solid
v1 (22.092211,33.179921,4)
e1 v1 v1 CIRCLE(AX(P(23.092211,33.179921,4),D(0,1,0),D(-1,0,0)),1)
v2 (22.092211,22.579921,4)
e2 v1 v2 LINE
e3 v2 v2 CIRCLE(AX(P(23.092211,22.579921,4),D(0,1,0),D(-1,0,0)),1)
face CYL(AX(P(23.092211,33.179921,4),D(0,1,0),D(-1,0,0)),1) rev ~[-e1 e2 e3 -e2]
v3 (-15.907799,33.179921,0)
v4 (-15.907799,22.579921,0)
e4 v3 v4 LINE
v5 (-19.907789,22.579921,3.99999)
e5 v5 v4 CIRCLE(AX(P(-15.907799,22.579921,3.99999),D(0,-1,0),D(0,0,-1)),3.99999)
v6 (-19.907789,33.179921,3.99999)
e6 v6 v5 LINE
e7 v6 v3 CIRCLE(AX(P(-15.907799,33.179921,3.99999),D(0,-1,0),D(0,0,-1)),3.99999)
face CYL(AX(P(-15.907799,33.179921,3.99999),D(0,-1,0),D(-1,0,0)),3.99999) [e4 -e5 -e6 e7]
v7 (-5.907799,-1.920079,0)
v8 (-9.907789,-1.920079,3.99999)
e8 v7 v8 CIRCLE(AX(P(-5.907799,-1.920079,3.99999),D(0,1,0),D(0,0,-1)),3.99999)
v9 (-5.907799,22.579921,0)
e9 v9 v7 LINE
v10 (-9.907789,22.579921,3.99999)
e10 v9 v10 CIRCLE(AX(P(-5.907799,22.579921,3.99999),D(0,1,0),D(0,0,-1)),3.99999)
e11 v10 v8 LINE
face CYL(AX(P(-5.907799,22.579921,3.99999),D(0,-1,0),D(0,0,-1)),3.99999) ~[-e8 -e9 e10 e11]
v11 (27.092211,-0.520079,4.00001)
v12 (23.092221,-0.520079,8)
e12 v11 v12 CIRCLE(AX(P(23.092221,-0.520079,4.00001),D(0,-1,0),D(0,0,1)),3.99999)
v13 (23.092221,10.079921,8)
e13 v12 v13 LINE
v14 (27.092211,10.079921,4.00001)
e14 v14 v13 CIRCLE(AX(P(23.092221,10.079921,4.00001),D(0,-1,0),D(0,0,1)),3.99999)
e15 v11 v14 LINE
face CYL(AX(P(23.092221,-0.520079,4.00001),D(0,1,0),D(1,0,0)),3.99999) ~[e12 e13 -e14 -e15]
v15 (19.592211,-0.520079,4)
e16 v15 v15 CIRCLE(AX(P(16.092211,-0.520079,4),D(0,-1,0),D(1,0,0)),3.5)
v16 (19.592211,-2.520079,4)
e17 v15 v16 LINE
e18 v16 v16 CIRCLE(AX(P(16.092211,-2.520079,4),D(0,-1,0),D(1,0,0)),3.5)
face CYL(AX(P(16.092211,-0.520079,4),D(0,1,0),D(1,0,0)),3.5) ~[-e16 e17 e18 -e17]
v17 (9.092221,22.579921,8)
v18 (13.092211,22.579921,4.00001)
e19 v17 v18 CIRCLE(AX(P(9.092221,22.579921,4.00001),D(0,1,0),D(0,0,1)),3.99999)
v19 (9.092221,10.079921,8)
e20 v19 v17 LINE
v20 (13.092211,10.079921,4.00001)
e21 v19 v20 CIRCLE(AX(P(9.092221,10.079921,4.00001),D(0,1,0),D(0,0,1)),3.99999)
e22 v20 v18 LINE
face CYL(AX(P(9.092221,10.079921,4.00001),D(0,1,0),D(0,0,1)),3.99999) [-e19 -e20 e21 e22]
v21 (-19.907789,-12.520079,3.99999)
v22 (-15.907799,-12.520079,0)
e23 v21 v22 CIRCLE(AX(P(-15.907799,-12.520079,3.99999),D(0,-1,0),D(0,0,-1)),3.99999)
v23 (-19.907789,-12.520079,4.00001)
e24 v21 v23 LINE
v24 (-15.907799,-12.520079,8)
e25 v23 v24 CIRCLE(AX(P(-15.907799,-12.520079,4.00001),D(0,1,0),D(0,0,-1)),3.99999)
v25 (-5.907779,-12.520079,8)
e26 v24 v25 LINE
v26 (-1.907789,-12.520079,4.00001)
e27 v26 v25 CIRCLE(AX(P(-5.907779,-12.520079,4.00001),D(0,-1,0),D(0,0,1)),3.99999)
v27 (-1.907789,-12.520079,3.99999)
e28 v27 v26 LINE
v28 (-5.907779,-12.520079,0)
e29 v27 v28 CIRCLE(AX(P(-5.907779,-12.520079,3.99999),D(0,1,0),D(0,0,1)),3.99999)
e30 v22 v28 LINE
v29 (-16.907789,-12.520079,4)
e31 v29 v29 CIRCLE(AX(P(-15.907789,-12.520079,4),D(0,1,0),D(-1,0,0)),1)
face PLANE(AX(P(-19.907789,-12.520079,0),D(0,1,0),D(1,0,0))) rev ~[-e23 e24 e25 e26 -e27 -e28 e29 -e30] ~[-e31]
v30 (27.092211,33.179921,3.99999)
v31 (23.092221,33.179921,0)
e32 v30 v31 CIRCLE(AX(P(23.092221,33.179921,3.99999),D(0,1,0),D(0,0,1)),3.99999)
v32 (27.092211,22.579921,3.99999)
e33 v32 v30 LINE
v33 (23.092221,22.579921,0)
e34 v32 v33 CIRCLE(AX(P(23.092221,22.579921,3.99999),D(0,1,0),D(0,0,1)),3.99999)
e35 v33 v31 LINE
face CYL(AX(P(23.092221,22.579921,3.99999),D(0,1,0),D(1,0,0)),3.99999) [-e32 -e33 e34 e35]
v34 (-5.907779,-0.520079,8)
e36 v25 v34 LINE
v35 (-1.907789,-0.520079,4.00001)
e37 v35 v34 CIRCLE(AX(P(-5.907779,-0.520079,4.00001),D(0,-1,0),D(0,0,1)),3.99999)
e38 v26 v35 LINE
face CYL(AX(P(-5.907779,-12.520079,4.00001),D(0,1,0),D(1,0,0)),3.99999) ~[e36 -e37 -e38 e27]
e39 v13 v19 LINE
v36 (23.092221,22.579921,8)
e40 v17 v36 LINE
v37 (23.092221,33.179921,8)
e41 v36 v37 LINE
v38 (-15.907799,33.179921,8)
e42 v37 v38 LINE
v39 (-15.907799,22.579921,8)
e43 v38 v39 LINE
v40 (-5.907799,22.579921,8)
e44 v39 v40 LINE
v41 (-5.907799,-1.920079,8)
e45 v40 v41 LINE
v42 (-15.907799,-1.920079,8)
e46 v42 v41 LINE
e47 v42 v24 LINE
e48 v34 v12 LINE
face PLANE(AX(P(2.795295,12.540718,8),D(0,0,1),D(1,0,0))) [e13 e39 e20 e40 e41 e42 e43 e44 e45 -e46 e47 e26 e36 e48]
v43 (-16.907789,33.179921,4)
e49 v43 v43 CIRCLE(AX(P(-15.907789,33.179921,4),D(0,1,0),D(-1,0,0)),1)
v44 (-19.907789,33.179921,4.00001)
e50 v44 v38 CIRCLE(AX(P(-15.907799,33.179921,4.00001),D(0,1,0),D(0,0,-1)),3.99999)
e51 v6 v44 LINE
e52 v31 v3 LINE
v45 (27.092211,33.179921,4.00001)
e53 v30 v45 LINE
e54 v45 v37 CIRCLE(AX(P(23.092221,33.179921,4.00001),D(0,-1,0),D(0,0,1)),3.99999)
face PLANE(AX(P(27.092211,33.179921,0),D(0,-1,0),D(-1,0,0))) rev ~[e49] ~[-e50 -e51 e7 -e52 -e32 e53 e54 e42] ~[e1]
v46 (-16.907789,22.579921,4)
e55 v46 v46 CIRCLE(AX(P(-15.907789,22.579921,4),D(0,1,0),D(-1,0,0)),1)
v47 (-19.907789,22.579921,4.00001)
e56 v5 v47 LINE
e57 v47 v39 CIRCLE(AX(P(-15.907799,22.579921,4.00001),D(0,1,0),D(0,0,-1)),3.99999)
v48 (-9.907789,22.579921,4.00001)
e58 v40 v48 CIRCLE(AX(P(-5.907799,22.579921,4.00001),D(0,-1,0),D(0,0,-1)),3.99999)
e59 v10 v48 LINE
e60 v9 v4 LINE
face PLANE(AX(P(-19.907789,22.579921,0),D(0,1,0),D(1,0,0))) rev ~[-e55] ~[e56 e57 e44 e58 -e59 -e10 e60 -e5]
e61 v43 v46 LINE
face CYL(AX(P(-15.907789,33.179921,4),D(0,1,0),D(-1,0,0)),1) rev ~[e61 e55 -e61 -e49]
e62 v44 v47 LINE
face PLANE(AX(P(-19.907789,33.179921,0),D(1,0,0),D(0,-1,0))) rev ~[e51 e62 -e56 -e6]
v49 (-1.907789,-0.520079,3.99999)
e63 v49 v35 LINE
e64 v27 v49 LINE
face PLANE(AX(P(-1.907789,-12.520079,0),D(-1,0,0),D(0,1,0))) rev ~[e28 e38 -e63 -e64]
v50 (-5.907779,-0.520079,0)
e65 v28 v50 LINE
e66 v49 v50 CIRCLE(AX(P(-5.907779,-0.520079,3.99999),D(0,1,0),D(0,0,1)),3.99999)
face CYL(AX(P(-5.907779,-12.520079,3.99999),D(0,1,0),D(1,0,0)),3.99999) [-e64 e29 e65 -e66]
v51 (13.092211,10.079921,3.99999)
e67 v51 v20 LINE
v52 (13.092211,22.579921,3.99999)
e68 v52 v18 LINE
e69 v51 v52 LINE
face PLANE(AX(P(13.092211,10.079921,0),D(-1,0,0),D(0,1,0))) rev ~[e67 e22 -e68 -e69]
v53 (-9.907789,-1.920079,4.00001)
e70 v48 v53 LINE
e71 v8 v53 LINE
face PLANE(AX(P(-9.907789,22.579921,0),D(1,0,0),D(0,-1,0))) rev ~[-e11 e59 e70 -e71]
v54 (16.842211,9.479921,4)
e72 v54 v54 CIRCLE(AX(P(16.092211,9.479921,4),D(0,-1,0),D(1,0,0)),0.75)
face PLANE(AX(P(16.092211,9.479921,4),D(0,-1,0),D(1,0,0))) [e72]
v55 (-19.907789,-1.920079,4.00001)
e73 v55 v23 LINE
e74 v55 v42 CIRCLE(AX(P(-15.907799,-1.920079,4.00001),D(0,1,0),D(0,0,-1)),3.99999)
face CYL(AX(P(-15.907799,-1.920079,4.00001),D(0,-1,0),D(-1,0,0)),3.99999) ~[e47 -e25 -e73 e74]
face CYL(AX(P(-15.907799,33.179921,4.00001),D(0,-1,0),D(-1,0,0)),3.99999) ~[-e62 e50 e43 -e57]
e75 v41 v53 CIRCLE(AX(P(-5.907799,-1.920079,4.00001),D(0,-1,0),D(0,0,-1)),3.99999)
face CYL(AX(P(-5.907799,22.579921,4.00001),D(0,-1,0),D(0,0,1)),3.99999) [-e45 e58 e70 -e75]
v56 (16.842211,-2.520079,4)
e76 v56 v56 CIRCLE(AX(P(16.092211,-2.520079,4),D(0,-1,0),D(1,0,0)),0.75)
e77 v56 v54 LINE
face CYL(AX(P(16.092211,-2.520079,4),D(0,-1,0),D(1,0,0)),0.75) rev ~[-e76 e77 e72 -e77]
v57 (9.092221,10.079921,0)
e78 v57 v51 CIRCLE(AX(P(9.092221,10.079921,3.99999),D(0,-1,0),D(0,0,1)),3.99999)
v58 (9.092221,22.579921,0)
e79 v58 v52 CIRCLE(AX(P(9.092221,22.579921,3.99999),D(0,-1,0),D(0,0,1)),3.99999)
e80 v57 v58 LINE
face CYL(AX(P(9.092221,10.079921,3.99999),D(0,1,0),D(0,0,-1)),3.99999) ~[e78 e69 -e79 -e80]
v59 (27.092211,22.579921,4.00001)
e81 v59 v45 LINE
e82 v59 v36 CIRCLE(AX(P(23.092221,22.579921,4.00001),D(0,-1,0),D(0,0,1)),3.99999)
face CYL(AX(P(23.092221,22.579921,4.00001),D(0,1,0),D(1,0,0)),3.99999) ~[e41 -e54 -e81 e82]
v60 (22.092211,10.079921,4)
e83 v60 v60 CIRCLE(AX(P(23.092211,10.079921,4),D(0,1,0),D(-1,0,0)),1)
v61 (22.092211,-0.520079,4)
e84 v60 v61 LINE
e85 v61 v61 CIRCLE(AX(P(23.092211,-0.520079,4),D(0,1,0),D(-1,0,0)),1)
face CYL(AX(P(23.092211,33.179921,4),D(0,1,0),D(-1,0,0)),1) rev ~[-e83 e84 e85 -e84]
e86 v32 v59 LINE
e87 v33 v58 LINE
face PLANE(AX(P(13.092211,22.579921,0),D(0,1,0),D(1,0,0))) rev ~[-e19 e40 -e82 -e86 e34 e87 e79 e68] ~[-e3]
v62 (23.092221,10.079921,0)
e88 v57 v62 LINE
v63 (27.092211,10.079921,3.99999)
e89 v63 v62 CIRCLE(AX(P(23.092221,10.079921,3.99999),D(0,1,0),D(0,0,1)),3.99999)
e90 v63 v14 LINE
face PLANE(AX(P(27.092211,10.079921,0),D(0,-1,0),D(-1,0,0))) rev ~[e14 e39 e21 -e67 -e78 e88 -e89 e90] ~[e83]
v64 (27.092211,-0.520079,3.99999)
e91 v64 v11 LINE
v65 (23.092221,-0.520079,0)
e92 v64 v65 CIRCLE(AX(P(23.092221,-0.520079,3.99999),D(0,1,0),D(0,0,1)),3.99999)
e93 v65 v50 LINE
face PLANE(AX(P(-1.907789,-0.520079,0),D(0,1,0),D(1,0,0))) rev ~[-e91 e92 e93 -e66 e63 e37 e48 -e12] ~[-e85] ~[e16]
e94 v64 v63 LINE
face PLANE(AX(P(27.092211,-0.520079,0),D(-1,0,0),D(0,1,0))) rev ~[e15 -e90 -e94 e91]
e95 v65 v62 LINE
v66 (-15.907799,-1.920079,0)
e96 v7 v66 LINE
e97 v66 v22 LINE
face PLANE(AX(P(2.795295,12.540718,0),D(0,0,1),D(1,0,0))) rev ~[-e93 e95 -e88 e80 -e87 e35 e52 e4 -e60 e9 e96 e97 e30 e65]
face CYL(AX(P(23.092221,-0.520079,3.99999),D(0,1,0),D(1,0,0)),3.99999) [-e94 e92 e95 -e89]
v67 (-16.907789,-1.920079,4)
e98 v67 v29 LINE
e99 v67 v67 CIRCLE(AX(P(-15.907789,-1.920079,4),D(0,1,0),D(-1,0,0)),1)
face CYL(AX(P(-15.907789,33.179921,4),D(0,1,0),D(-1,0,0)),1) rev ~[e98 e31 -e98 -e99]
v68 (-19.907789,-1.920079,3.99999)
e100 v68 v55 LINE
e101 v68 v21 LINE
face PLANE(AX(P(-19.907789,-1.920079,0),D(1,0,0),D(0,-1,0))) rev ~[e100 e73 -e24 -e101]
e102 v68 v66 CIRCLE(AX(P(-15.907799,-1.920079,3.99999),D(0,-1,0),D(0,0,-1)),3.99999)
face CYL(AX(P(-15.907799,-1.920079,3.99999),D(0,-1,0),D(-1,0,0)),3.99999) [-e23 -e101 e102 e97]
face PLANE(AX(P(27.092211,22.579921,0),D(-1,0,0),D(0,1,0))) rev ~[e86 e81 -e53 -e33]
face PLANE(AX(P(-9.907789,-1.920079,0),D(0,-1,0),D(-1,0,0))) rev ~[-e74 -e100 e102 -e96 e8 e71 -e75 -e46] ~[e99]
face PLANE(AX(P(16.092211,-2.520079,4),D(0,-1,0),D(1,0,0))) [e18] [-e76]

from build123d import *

# Parameters (mm, degrees)
F1_DEPTH = 8
F2_R     = 3.99999
F3_R     = 1
F4_DEPTH = 60
F6_R     = 3.99999
F5_R     = 3.5
F7_DEPTH = 2
F8_R     = 0.75
F9_DEPTH = 12


# Not quite as in the source:
# - a fillet or chamfer is up to 0.001 mm smaller than in the source, because OpenCascade refuses the exact size


with BuildPart() as f1:
    # F0 (on Top) → F1 (new body)
    with BuildSketch(Plane.XY):
        Polygon((-19.9077894302, -1.920078908), (-19.9077894302, -12.520078908), (-1.9077894302, -12.520078908), (-1.9077894302, -0.520078908), (27.0922105698, -0.520078908), (27.0922105698, 10.079921092), (13.0922105698, 10.079921092), (13.0922105698, 22.579921092), (27.0922105698, 22.579921092), (27.0922105698, 33.179921092), (-19.9077894302, 33.179921092), (-19.9077894302, 22.579921092), (-9.9077894302, 22.579921092), (-9.9077894302, -1.920078908), align=None)
    extrude(amount=F1_DEPTH)

    # F2 (radius 4 in the source; OpenCascade refuses exactly that, so slightly less here)
    f2_edges = [f1.edges().sort_by_distance(p)[0] for p in [
        (-19.907789, -7.220079, 8),
        (-19.907789, -7.220079, 0),
        (-1.907789, -6.520079, 8),
        (-1.907789, -6.520079, 0),
        (27.092211, 4.779921, 8),
        (27.092211, 4.779921, 0),
        (27.092211, 27.879921, 8),
        (27.092211, 27.879921, 0),
        (-19.907789, 27.879921, 8),
        (-19.907789, 27.879921, 0),
    ]]
    fillet(f2_edges, radius=F2_R)

    # F3 (on face) → F4 (cut)
    with BuildSketch(Plane(origin=(0, 33.179921092, 0), x_dir=(-1, 0, 0), z_dir=(0, 1, 0))):
        with Locations((-23.0922105698, 4)):
            Circle(F3_R)
        with Locations((15.9077894302, 4)):
            Circle(F3_R)
    extrude(amount=-F4_DEPTH, mode=Mode.SUBTRACT)

    # F6 (radius 4 in the source; OpenCascade refuses exactly that, so slightly less here)
    f6_edges = [f1.edges().sort_by_distance(p)[0] for p in [
        (-9.907789, 10.329921, 8),
        (-9.907789, 10.329921, 0),
        (13.092211, 16.329921, 8),
        (13.092211, 16.329921, 0),
    ]]
    fillet(f6_edges, radius=F6_R)

    # F5 (on face) → F7 (join)
    with BuildSketch(Plane.XZ.offset(0.520078908)):
        with Locations((16.0922105698, 4)):
            Circle(F5_R)
    extrude(amount=F7_DEPTH)

    # F8 (on face) → F9 (cut)
    with BuildSketch(Plane.XZ.offset(2.520078908)):
        with Locations((16.0922105698, 4)):
            Circle(F8_R)
    extrude(amount=-F9_DEPTH, mode=Mode.SUBTRACT)


solid = f1.part
